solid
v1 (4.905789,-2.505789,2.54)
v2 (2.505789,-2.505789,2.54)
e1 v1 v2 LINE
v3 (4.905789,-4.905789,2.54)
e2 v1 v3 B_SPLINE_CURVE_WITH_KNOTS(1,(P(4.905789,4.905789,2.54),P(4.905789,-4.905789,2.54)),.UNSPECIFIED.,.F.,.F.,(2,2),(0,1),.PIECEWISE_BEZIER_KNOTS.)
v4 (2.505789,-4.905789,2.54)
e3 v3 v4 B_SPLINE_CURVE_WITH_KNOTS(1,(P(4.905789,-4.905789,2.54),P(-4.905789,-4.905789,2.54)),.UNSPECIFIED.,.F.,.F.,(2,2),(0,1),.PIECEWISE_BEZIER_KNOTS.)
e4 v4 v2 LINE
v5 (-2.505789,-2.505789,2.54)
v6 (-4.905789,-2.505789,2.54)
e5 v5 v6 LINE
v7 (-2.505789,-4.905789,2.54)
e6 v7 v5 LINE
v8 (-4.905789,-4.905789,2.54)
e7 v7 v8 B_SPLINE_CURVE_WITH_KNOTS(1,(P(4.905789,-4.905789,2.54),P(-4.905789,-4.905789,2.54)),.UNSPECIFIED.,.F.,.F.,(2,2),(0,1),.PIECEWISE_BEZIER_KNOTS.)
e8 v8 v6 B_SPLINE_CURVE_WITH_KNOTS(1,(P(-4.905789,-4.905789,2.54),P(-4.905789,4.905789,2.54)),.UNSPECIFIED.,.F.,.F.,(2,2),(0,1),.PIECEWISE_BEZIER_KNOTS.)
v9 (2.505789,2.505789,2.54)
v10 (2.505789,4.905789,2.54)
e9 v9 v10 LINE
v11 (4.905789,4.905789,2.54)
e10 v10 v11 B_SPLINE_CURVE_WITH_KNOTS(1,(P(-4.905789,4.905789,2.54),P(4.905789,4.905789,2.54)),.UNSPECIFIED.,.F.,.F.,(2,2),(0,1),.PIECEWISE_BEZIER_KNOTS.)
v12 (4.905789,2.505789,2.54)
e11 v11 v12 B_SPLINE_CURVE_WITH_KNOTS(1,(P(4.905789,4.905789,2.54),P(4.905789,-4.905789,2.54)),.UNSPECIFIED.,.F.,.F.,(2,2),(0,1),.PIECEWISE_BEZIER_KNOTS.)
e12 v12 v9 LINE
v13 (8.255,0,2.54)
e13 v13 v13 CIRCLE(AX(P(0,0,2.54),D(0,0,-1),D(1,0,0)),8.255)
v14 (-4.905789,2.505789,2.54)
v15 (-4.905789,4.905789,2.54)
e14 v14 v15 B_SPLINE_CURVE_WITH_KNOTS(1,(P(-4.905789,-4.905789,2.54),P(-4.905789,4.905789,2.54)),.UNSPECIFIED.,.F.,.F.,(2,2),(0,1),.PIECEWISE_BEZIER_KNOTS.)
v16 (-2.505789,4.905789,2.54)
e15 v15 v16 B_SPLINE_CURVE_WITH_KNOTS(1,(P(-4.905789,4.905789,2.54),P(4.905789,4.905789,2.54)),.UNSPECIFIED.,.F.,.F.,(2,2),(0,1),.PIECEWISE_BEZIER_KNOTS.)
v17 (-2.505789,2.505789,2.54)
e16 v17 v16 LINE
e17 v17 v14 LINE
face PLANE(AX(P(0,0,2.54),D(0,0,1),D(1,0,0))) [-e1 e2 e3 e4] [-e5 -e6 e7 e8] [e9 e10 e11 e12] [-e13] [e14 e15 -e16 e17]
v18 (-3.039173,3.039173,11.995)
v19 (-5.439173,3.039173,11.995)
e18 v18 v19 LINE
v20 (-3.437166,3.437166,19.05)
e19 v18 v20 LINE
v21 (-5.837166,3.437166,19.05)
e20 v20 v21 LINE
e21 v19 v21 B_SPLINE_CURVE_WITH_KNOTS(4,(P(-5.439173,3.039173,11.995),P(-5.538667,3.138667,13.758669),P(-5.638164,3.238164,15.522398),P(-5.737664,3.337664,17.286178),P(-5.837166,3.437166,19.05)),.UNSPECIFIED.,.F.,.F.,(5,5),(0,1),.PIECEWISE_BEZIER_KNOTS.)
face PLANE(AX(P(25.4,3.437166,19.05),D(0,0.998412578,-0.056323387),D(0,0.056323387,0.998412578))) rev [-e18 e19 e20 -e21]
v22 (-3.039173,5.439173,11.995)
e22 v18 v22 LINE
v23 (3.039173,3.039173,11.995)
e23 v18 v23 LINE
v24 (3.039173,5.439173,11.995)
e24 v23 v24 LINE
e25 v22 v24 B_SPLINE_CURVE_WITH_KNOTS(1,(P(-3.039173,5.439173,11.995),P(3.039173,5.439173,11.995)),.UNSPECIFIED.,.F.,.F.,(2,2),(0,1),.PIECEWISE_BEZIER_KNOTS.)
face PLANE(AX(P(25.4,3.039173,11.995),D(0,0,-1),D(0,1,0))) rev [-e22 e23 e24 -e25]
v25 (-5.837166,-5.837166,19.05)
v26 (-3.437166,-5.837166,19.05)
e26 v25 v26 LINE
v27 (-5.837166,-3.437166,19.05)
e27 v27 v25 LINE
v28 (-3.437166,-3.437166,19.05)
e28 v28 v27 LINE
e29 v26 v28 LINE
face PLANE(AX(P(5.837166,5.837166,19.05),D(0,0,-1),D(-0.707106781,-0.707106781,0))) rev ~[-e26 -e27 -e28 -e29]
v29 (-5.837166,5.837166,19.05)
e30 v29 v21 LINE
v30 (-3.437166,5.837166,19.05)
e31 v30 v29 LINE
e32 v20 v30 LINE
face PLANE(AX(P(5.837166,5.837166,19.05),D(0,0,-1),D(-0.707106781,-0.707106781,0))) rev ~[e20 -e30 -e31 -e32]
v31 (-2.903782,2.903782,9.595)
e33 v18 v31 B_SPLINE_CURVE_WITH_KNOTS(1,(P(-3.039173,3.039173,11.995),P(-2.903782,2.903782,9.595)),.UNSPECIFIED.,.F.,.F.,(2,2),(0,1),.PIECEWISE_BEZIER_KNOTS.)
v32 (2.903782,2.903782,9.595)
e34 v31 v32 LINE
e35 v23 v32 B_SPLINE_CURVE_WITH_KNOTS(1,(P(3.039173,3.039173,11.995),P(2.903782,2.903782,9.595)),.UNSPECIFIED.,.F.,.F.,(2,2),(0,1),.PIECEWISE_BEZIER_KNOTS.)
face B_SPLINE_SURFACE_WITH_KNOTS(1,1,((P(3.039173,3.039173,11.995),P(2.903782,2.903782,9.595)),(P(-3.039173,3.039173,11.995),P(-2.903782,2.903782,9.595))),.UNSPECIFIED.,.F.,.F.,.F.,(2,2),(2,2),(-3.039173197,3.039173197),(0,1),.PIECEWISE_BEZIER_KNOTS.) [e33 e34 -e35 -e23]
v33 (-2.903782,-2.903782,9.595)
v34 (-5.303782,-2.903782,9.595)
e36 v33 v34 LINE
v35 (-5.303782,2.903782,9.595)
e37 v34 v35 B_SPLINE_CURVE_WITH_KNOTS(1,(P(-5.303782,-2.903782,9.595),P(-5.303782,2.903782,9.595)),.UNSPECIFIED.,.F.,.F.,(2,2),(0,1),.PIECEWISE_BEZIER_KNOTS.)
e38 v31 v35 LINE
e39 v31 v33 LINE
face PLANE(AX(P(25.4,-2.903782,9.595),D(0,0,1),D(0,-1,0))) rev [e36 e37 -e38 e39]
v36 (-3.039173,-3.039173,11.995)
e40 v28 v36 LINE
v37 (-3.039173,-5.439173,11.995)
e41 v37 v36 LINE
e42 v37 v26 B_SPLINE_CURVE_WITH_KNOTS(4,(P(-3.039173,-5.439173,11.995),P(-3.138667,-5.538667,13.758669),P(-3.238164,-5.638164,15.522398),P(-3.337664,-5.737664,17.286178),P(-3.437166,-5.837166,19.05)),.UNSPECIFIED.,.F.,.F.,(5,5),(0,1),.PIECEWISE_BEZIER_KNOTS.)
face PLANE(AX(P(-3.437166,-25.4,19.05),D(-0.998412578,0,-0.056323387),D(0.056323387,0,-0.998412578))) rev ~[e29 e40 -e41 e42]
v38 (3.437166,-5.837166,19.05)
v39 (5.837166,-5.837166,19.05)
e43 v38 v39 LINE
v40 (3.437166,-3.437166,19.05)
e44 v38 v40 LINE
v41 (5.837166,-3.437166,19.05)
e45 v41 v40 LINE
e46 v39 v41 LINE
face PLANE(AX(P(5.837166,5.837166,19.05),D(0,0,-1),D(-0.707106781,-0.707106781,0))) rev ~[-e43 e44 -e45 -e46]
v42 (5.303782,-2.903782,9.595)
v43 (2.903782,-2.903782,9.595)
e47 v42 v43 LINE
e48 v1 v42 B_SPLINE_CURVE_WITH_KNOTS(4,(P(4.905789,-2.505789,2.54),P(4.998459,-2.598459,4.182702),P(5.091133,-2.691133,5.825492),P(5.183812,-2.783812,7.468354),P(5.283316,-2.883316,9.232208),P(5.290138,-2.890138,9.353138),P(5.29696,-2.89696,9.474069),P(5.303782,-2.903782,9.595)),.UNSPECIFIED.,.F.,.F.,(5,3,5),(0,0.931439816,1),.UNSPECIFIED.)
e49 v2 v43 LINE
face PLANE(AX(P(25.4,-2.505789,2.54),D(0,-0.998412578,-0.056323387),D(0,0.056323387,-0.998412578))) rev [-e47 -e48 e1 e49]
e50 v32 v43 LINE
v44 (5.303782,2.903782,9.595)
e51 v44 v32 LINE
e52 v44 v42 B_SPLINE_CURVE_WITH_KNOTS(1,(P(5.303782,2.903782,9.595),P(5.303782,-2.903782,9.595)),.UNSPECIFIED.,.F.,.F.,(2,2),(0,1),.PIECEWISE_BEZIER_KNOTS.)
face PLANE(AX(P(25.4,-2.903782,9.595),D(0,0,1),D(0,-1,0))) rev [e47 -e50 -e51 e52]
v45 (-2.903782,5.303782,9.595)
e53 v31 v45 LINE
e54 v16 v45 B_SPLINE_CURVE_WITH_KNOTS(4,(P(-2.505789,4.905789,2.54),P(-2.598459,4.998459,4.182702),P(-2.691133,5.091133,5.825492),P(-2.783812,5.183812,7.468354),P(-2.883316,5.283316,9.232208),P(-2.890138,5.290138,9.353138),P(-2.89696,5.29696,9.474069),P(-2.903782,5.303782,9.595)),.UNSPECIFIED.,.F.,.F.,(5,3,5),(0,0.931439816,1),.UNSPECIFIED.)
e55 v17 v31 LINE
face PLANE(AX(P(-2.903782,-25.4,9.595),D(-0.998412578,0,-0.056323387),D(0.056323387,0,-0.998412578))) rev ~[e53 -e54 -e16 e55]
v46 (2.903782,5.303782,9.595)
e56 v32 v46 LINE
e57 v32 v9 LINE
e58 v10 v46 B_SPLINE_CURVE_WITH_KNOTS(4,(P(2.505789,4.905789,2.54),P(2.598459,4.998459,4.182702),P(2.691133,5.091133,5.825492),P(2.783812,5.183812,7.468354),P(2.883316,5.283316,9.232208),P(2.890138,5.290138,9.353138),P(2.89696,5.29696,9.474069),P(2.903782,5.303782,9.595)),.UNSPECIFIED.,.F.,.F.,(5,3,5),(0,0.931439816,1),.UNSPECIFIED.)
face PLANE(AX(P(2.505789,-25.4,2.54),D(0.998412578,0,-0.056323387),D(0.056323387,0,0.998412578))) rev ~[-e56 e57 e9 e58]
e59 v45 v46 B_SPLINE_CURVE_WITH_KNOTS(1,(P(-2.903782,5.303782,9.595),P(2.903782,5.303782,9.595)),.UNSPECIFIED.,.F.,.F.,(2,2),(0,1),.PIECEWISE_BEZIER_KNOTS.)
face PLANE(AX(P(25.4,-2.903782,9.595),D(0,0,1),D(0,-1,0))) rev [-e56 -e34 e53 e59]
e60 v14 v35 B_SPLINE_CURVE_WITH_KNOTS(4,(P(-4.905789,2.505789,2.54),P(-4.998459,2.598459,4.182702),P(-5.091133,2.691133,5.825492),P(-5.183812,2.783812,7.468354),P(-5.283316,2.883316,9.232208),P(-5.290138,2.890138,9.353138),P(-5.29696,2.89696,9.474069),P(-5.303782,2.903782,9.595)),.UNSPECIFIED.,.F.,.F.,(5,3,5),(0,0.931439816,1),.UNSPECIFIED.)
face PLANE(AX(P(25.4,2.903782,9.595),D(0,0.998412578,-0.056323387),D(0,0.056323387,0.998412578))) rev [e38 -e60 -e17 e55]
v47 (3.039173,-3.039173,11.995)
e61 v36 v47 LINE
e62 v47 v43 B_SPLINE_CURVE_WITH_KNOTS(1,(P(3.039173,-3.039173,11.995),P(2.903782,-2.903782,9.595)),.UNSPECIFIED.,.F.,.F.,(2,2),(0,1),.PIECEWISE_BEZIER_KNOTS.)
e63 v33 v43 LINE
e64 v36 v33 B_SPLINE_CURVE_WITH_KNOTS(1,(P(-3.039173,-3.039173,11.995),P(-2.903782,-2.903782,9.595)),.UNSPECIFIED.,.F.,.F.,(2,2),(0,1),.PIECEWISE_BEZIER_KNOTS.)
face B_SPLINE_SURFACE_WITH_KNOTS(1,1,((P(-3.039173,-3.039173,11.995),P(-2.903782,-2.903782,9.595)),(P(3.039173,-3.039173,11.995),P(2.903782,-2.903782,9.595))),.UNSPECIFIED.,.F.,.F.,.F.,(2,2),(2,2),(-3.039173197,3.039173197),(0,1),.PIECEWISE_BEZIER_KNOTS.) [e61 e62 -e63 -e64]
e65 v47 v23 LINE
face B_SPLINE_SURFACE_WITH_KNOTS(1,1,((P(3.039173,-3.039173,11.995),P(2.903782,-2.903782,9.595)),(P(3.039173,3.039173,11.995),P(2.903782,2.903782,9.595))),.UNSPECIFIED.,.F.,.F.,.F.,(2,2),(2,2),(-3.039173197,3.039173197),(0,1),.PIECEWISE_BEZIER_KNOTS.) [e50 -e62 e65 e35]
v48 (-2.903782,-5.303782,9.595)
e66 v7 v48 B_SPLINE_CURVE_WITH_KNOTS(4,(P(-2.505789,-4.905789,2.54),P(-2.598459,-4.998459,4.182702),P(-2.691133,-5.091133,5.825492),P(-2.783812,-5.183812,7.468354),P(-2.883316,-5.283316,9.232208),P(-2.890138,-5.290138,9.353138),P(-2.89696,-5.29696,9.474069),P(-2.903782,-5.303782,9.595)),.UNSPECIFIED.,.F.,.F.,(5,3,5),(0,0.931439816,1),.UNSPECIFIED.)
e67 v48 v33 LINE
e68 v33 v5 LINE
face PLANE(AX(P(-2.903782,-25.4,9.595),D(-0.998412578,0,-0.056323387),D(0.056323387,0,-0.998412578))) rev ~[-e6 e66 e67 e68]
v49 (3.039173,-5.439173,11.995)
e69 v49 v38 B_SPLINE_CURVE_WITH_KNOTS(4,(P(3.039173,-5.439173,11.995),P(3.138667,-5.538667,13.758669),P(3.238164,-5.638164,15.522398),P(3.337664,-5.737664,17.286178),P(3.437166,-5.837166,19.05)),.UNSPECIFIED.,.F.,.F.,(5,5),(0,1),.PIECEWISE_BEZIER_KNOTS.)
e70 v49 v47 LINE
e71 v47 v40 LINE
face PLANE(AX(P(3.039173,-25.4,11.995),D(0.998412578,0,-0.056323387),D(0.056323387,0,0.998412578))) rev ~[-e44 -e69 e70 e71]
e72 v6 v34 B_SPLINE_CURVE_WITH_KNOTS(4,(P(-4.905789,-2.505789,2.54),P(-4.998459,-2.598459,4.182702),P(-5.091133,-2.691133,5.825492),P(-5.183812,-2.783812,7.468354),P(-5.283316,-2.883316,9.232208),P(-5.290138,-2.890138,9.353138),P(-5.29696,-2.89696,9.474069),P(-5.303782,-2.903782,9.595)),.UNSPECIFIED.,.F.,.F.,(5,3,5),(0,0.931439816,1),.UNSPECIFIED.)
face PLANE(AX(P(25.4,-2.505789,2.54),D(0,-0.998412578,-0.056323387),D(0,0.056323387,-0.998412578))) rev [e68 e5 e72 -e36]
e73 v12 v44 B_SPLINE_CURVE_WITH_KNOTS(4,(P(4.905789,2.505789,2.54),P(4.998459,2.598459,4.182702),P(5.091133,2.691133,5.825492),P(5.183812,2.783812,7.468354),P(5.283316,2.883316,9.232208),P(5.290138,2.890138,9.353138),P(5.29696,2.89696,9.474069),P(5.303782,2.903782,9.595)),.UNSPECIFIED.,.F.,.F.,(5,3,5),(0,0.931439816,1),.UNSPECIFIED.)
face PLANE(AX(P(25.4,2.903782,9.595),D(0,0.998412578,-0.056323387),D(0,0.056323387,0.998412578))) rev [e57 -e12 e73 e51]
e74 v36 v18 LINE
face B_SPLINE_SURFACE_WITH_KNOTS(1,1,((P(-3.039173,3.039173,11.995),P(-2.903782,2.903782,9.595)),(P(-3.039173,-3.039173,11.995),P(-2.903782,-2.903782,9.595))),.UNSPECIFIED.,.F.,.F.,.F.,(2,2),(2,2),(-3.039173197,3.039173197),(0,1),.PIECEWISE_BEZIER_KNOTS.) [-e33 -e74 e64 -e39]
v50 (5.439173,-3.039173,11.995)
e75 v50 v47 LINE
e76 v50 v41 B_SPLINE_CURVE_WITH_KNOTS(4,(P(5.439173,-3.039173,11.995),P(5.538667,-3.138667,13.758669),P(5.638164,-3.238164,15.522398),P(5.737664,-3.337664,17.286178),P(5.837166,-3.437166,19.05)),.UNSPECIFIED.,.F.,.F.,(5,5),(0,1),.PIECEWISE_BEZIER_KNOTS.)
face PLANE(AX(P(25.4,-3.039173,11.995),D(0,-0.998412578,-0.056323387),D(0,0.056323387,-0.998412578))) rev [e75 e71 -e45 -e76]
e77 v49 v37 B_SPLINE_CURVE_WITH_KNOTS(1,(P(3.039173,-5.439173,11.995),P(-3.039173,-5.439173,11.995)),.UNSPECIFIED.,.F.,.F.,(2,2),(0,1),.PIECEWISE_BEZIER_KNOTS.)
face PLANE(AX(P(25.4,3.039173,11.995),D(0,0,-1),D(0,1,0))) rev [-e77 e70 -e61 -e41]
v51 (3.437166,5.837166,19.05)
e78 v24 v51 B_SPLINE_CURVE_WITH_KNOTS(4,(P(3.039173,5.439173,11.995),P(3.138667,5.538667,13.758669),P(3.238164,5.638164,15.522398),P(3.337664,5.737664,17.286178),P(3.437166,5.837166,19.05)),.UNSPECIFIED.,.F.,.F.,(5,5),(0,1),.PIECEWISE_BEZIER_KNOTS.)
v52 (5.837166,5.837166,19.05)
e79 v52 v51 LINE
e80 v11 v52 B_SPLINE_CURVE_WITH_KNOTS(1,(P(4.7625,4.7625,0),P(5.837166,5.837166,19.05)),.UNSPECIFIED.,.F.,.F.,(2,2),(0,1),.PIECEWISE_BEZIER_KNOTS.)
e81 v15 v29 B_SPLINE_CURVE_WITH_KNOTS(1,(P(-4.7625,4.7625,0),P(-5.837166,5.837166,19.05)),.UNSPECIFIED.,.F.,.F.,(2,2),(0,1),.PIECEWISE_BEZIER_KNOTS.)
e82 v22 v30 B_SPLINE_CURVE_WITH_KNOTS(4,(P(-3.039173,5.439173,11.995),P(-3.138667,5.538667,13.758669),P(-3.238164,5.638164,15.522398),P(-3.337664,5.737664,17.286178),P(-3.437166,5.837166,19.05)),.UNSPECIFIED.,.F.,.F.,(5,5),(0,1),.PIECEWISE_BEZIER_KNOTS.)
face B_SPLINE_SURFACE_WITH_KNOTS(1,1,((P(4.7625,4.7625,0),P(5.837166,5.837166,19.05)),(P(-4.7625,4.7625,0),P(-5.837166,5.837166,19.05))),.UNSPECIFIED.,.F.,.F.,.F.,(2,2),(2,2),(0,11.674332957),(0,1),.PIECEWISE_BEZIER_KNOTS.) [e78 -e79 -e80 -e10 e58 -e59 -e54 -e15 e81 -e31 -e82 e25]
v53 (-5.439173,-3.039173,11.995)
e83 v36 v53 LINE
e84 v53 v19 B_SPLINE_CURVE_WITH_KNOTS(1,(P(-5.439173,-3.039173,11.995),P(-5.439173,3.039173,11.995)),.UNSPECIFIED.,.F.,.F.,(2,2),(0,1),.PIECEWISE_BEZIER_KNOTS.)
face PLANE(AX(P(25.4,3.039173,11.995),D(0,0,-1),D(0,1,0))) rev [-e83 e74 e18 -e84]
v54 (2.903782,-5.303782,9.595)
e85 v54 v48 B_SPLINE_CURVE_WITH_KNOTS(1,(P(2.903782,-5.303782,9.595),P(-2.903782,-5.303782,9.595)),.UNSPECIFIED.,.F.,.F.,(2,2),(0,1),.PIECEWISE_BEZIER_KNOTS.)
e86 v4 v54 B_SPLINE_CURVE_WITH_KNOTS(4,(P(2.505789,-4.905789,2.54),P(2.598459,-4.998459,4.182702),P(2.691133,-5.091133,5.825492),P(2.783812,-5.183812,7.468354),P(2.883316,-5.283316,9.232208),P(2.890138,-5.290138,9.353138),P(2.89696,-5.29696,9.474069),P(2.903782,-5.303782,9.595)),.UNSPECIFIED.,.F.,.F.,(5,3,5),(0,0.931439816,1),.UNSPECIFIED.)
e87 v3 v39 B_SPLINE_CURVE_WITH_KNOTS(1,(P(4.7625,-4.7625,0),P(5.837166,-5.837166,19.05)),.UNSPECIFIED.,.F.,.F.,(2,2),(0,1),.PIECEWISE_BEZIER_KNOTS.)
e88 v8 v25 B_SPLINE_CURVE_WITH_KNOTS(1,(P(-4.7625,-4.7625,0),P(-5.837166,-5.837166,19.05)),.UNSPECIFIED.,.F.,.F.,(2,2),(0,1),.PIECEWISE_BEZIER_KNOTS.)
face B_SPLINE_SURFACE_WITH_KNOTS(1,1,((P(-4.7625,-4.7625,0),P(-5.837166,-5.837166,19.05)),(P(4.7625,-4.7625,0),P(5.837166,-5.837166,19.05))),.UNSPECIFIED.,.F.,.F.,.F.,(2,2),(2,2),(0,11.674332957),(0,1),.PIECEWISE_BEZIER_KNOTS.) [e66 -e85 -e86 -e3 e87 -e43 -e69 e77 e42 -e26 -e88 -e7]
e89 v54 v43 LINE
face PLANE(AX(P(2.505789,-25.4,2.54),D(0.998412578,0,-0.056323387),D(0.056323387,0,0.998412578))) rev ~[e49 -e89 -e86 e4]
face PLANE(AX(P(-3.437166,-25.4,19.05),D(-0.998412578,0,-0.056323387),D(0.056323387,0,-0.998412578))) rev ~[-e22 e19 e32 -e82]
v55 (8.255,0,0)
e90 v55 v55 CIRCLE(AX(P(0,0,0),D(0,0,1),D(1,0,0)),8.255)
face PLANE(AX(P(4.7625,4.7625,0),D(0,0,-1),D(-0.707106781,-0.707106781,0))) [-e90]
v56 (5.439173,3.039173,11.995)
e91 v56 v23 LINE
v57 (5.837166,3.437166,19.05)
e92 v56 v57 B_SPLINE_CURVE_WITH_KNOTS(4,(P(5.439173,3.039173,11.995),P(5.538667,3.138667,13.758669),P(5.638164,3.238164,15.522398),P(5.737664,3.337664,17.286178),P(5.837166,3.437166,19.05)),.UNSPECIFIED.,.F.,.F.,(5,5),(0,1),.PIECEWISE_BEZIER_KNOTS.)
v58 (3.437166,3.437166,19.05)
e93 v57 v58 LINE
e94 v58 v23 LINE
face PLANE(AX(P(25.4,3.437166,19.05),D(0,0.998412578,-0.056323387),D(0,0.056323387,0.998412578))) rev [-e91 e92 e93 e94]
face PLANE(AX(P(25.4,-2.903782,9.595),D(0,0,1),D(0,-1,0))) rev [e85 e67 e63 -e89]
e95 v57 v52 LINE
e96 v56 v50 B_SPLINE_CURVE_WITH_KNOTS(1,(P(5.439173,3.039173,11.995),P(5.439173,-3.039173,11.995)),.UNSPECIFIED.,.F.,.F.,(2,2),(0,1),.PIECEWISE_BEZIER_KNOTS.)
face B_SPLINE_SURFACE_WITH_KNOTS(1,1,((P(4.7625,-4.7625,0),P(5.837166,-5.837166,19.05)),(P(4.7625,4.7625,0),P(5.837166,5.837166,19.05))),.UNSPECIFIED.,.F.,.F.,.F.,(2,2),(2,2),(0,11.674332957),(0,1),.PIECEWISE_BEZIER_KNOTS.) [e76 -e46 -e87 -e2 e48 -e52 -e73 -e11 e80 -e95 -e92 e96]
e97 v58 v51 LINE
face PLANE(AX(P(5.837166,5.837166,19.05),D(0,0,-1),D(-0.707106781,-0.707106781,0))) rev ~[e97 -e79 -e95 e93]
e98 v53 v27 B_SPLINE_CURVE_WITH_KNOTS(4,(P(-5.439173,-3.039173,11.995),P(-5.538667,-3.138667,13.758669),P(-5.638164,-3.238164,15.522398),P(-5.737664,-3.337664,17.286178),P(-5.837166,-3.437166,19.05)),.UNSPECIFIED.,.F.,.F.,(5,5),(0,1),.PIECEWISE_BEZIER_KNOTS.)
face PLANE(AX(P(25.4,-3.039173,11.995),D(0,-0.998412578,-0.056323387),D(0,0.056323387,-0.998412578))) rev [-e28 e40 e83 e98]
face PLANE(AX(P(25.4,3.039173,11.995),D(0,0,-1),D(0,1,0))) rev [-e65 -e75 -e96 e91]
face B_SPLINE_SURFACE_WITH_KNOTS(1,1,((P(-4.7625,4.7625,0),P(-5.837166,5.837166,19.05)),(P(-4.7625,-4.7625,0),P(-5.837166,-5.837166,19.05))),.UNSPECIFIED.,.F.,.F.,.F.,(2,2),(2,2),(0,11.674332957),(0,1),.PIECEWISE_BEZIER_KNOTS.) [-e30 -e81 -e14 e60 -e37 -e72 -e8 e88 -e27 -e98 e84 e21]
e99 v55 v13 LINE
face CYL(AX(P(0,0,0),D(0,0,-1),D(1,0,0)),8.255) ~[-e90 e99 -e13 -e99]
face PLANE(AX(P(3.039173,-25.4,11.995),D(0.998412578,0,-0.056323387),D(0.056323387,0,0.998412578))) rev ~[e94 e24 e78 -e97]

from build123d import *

# Parameters (mm, degrees)
F0_R     = 8.255
F1_DEPTH = 2.54
F8_DEPTH = 33.656
F9_W     = 6.078346395
F9_H     = 6.078346395
F10_W    = 5.8075642901
F10_H    = 5.8075642901


# Not quite as in the source:
# - a pattern or mirror of a feature is missing from the dataset's text; its kind, count and spacing are read off the source's solid


with BuildPart() as f1:
    # F0 (on Top) → F1 (new body)
    with BuildSketch(Plane.XY):
        Circle(F0_R)
    extrude(amount=F1_DEPTH)

    # F2 (on Top) → F5 section 0
    with BuildSketch(Plane.XY):
        Polygon((4.7625, 2.3625), (4.7625, 4.7625), (2.3625, 4.7625), (-2.3625, 4.7625), (-4.7625, 4.7625), (-4.7625, 2.3625), (-4.7625, -2.3625), (-4.7625, -4.7625), (-2.3625, -4.7625), (2.3625, -4.7625), (4.7625, -4.7625), (4.7625, -2.3625), align=None)
    # F4 (on offset) → F5 section 1
    with BuildSketch(Plane.XY.offset(19.05)):
        Polygon((-3.4371664787, 5.8371664787), (-5.8371664787, 5.8371664787), (-5.8371664787, 3.4371664787), (-5.8371664787, -3.4371664787), (-5.8371664787, -5.8371664787), (-3.4371664787, -5.8371664787), (3.4371664787, -5.8371664787), (5.8371664787, -5.8371664787), (5.8371664787, -3.4371664787), (5.8371664787, 3.4371664787), (5.8371664787, 5.8371664787), (3.4371664787, 5.8371664787), align=None)
    loft()

    # F7 (on offset) → F8 (cut, through all)
    with BuildSketch(Plane.XZ.offset(25.4)):
        Polygon((3.0391731975, 11.995), (3.4371664787, 19.05), (-3.4371664787, 19.05), (-3.0391731975, 11.995), align=None)
        Polygon((-2.5057888638, 2.54), (2.5057888638, 2.54), (2.903782145, 9.595), (-2.903782145, 9.595), align=None)
    f8 = extrude(amount=-F8_DEPTH, mode=Mode.SUBTRACT)

    # F8_copies: F8 across plane
    add(f8.mirror(Plane(origin=(0, 0, 0), x_dir=(0.7071067812, -0.7071067812, 0), z_dir=(0.7071067812, 0.7071067812, 0))), mode=Mode.SUBTRACT)

    # F9 (on face) → F11 section 0
    with BuildSketch(Plane.XY.offset(11.995)):
        Rectangle(F9_W, F9_H)
    # F10 (on face) → F11 section 1
    with BuildSketch(Plane(origin=(0, 0, 9.595), x_dir=(1, 0, 0), z_dir=(0, 0, -1))):
        Rectangle(F10_W, F10_H)
    loft(mode=Mode.SUBTRACT)


solid = f1.part
